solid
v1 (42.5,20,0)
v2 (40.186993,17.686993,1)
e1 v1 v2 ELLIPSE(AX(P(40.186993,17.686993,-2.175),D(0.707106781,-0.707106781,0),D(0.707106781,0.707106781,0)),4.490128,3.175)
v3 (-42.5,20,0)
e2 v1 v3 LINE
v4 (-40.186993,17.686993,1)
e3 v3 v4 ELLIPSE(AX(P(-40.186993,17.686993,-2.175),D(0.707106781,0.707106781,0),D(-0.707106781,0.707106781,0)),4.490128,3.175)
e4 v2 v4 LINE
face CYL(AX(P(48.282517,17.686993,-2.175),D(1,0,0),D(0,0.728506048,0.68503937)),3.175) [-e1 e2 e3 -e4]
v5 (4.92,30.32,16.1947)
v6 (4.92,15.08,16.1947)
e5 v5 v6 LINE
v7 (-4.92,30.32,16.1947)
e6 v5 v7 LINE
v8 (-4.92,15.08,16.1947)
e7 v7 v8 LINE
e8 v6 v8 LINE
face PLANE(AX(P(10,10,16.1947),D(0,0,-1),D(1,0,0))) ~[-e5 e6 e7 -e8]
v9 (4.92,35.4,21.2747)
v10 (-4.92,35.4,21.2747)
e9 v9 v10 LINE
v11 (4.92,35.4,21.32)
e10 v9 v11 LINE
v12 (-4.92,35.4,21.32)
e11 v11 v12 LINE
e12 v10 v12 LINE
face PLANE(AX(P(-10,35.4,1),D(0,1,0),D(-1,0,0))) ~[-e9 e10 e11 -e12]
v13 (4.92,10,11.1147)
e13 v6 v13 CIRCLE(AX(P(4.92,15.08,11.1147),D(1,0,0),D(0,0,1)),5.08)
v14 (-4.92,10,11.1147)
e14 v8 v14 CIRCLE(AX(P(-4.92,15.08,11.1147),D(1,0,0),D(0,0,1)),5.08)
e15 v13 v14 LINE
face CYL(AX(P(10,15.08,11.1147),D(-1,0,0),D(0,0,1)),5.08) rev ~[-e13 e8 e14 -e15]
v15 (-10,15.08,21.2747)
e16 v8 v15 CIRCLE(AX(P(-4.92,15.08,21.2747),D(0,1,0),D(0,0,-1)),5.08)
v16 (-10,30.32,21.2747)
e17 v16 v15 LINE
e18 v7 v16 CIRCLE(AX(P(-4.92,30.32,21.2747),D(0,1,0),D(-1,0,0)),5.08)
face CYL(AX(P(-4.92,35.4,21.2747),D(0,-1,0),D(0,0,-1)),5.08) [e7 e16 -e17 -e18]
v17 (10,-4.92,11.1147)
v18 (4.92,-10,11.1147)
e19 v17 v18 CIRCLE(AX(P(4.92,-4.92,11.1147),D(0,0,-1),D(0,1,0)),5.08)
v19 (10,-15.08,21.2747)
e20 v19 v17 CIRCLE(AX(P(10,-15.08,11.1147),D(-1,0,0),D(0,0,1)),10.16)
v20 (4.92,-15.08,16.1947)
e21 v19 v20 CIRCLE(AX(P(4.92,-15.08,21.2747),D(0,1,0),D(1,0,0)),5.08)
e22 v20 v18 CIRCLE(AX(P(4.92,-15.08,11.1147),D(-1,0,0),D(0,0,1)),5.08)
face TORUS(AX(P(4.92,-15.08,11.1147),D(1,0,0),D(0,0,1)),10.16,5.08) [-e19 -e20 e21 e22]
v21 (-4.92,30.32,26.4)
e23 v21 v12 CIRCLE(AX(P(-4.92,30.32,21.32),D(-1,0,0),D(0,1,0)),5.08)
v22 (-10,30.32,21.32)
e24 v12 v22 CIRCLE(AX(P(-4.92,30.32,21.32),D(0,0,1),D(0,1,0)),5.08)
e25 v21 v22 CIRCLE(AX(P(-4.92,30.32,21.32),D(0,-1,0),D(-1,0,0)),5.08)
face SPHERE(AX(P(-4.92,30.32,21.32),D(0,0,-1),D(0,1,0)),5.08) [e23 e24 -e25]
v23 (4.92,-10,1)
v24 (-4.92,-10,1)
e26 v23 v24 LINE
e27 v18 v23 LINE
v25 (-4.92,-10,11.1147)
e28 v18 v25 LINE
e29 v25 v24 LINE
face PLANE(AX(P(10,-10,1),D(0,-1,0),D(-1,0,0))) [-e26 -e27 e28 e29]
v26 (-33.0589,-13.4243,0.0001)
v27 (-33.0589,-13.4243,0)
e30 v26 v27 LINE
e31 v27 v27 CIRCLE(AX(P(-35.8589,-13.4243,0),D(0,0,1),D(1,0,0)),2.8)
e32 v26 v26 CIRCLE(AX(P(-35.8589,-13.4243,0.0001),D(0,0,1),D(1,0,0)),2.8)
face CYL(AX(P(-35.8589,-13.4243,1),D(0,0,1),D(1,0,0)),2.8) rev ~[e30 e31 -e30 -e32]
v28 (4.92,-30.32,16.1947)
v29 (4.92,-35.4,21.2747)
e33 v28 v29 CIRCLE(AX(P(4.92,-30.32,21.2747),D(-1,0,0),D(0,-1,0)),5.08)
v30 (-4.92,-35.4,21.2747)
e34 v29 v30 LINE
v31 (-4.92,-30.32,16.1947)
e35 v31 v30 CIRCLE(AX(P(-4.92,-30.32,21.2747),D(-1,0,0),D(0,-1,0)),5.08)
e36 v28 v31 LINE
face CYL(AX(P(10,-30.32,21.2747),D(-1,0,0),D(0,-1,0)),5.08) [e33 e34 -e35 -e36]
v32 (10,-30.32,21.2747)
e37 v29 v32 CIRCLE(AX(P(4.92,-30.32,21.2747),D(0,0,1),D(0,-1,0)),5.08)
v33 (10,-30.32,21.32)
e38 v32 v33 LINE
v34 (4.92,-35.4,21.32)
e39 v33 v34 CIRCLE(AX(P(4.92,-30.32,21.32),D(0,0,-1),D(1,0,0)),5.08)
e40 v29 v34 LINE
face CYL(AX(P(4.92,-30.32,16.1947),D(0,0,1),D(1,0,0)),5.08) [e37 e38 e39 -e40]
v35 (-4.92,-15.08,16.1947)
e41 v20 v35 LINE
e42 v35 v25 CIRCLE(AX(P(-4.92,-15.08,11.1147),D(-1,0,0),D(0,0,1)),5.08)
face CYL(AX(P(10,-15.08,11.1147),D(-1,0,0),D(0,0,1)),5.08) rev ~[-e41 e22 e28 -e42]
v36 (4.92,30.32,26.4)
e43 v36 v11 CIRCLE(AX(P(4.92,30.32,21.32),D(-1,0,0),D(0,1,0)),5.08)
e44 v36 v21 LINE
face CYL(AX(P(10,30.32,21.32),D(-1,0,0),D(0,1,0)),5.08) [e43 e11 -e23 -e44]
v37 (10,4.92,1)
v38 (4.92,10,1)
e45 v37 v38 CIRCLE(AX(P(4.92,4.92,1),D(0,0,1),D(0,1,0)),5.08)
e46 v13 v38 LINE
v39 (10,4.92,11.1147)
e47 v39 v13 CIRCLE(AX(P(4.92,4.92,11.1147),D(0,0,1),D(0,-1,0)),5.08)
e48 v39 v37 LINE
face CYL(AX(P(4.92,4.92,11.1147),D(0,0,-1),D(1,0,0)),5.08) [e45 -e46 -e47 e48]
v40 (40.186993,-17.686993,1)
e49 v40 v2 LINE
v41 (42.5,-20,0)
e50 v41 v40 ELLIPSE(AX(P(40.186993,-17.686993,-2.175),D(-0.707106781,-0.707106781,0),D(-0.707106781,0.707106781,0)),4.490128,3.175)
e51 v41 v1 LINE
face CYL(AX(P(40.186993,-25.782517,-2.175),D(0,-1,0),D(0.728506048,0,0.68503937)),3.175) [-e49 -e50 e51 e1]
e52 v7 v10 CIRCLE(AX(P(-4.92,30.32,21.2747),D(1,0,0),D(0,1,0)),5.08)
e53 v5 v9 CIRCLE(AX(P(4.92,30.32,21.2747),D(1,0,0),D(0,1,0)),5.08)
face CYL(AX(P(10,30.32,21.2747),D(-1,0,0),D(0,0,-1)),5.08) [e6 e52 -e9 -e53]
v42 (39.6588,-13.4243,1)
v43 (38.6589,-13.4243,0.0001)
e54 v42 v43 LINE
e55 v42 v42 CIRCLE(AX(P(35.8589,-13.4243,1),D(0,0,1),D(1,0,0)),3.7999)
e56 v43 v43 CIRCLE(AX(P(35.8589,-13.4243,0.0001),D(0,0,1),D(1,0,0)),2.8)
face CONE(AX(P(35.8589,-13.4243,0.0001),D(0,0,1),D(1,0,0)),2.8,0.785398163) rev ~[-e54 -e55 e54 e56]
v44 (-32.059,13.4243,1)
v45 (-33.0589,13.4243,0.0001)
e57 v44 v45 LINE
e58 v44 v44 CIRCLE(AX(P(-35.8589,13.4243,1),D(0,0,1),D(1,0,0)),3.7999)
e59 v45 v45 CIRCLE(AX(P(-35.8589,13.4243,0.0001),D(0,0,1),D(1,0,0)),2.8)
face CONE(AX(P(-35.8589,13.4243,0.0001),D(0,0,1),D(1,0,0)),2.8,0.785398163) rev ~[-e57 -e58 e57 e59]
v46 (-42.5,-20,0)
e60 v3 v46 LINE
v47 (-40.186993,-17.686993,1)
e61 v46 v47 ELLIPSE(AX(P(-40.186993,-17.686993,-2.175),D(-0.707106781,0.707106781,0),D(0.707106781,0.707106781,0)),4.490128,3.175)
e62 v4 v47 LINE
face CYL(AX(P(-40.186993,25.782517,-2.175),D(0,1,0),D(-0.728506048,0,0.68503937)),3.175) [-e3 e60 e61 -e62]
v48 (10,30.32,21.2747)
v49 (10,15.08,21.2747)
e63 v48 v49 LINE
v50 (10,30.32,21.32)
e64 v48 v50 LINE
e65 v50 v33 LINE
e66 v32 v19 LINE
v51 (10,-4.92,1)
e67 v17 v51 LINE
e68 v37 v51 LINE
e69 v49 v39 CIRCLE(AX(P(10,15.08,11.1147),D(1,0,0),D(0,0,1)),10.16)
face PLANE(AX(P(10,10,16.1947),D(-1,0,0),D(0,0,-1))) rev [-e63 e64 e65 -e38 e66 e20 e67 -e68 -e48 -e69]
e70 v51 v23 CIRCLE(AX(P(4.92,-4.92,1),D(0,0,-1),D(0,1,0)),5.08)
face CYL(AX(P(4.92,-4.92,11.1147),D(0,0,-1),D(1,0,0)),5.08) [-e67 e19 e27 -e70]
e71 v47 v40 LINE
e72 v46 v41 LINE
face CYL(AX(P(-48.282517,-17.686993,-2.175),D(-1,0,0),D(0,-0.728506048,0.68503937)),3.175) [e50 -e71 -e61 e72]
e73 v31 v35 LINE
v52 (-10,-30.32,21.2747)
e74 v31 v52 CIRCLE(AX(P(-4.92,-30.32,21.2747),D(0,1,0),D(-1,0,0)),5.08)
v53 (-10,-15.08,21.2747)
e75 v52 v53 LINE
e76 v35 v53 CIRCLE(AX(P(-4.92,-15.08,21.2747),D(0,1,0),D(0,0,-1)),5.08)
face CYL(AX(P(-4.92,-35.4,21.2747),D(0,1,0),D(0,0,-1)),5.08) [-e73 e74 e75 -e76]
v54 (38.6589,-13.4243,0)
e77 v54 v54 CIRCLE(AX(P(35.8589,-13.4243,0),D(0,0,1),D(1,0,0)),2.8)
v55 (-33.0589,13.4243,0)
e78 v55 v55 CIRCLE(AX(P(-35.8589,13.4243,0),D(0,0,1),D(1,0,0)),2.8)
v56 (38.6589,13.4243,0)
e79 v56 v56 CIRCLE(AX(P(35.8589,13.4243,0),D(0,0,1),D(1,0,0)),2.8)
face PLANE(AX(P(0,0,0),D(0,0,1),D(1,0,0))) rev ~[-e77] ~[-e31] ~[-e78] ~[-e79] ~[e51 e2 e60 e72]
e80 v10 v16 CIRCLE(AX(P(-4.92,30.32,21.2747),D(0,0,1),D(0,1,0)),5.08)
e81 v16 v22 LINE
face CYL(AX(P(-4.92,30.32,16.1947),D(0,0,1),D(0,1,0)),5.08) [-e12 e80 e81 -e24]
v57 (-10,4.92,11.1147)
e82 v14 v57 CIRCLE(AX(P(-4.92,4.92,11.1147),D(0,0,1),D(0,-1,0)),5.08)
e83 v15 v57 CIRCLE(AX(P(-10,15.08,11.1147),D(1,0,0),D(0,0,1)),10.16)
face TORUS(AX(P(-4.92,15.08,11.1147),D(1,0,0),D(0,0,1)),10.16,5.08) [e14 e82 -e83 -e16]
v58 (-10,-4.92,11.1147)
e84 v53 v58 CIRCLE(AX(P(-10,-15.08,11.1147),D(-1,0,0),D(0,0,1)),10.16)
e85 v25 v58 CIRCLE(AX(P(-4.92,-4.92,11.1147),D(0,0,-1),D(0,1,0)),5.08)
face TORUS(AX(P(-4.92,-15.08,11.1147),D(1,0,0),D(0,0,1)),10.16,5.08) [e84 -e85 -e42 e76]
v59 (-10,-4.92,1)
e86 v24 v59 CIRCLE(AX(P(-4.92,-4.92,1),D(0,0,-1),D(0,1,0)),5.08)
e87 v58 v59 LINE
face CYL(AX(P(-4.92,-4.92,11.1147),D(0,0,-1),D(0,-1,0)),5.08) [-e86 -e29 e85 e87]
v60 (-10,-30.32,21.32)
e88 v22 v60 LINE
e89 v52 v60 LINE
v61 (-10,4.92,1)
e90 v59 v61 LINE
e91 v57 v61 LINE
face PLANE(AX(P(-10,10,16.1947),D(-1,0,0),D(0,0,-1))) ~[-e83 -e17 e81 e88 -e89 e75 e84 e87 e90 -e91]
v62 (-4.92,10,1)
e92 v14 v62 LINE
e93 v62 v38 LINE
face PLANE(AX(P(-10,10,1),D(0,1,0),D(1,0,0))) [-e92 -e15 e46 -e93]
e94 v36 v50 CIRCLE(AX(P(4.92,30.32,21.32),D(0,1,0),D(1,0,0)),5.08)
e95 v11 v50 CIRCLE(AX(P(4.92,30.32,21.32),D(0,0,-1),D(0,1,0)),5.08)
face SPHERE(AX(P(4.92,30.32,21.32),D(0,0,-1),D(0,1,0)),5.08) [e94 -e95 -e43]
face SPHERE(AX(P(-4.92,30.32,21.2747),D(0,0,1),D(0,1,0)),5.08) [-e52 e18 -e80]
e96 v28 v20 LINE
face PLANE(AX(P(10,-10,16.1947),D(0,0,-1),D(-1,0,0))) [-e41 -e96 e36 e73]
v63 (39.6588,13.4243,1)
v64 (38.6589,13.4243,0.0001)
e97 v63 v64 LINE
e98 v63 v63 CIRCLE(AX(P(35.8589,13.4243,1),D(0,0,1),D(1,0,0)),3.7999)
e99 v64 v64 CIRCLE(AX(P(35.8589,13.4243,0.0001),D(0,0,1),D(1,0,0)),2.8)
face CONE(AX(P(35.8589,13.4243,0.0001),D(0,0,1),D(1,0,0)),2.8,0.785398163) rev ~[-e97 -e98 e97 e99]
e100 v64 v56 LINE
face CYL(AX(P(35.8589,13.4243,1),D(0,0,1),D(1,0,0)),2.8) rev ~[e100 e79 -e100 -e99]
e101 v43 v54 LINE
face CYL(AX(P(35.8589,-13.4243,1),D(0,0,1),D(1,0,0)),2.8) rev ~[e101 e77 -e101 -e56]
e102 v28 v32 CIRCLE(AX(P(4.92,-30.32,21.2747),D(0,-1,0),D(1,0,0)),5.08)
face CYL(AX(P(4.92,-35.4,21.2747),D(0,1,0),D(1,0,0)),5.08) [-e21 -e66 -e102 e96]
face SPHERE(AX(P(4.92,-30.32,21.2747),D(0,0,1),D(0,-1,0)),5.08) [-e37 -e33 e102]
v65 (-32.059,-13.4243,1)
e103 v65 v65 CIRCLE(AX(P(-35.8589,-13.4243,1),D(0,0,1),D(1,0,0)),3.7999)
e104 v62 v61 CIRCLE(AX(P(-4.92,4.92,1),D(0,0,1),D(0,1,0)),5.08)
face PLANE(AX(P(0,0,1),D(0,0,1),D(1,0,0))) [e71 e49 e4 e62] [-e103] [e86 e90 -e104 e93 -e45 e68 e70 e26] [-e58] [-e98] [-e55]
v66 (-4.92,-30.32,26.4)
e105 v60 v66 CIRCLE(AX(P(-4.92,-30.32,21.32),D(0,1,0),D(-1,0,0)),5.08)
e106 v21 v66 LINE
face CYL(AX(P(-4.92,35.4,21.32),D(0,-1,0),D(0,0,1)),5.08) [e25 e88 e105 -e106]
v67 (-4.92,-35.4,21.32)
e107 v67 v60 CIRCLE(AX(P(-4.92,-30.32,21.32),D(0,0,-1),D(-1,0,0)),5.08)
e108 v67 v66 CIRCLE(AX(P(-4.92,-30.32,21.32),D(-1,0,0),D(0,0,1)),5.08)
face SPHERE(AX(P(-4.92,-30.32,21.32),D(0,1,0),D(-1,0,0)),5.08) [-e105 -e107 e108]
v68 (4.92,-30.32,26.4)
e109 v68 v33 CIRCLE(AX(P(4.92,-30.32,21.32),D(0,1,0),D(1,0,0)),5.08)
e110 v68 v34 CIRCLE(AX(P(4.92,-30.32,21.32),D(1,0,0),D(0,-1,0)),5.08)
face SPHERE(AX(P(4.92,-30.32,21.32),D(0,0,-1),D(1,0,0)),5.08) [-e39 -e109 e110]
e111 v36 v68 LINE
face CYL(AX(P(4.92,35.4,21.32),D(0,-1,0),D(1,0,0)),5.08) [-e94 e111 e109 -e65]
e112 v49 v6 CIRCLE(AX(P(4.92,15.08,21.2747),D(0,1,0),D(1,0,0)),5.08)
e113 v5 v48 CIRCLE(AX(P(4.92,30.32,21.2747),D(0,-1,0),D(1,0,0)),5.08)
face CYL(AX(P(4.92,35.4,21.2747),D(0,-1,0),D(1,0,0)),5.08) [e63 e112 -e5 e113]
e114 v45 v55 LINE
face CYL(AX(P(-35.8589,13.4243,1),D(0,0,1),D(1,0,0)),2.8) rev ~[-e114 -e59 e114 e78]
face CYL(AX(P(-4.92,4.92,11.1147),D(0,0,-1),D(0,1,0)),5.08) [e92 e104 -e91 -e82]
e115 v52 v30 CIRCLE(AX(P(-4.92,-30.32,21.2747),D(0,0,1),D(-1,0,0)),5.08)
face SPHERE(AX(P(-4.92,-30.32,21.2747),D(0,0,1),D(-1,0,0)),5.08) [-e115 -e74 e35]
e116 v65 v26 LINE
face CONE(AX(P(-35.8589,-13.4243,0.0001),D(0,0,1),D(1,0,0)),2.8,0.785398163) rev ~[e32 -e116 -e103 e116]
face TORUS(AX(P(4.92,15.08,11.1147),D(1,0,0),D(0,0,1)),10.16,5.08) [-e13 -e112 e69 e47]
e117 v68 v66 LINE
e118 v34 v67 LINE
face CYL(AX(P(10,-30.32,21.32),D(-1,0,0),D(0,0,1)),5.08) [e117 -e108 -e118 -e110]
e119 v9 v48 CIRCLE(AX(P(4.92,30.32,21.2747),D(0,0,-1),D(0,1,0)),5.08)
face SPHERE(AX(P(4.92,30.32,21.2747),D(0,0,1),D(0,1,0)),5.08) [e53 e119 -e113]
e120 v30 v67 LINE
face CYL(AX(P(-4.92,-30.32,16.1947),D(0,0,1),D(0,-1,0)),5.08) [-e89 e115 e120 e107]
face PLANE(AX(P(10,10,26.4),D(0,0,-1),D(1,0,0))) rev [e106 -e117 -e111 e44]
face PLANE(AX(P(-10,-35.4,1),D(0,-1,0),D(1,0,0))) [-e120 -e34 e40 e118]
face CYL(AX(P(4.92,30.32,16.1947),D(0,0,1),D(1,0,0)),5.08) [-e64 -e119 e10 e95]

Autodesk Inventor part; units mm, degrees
ref_plane "YZ Plane" through (0, 0, 0) normal (1, 0, 0) x (0, 1, 0)
ref_plane "XZ Plane" through (0, 0, 0) normal (0, 1, 0) x (-1, 0, 0)
ref_plane "XY Plane" through (0, 0, 0) normal (0, 0, 1) x (1, 0, 0)
sketch "Sketch1" plane through (0, 0, 0) normal (0, 0, 1) x (1, 0, 0)
  line L0 (-42.5, -20) -> (42.5, -20)
  line L1 (42.5, -20) -> (42.5, 20)
  line L2 (42.5, 20) -> (-42.5, 20)
  line L3 (-42.5, 20) -> (-42.5, -20)
  line L4 (-42.5, -20) -> (42.5, 20) construction
  line L5 (42.5, -20) -> (-42.5, 20) construction
  point P0 (0, 0)
  dimension "d0" = 85
  dimension "d1" = 40
extrude "Extrusion1" add sketch "Sketch1" along normal blind 1
fillet "Fillet1" radius 3.175 4 edges at (-42.5, 0, 1) (0, 20, 1) (0, -20, 1) (42.5, 0, 1)
sketch "Sketch2" plane through (0, 0, 1) normal (0, 0, 1) x (1, 0, 0)
  line L0 (-40.187, -17.687) -> (-40.187, 17.687) construction
  line L1 (-40.187, 0) -> (40.187, 0) construction
  line L2 (40.187, 17.687) -> (40.187, -17.687) construction
  line L3 (-40.187, 17.687) -> (40.187, 17.687) construction
  line L4 (0, 17.687) -> (0, -17.687) construction
  line L5 (40.187, -17.687) -> (-40.187, -17.687) construction
  line L6 (10, -10) -> (-10, -10)
  line L7 (-10, -10) -> (-10, 10)
  line L8 (-10, 10) -> (10, 10)
  line L9 (10, 10) -> (10, -10)
  line L10 (10, -10) -> (-10, 10) construction
  line L11 (-10, -10) -> (10, 10) construction
  point P0 (0, 0)
  dimension "d5" = 20
  dimension "d6" = 20
extrude "Extrusion2" add sketch "Sketch2" along normal blind 25.4
sketch "Sketch3" plane through (-10, -10, 1) normal (0, -1, 0) x (1, 0, 0)
  line L0 (20, 25.4) -> (0, 25.4) projected
  line L1 (20, 0) -> (20, 25.4) projected
  line L2 (0, 25.4) -> (20, 25.4)
  line L3 (20, 25.4) -> (20, 15.1947)
  line L4 (20, 15.1947) -> (0, 15.1947)
  line L5 (0, 15.1947) -> (0, 25.4)
  point P0 (10, -1)
sketch "Sketch4" plane through (0, 0, 26.4) normal (0, 0, 1) x (1, 0, 0)
  line L0 (-10, -10) -> (-10, 10) construction
  line L1 (-10, 0) -> (10, 0) construction
  line L2 (10, 10) -> (10, -10) construction
  point P0 (0, 0)
ref_plane "Work Plane1" through (-10, 0, 26.4) normal (0, -1, 0) x (1, 0, 0)
extrude "Extrusion3" add sketch "Sketch3" along normal blind 25.4
mirror "Mirror1" about plane through (-10, 0, 26.4) normal (0, -1, 0) of "Extrusion3"
fillet "Fillet2" radius 5.08 2 edges at (0, -10, 16.1947) (0, 10, 16.1947)
fillet "Fillet3" radius 5.08 22 edges at (-10, 35.4, 21.2974) (10, 35.4, 21.2974) (0, 35.4, 16.1947) (0, 35.4, 26.4) (-10, 0, 26.4) (-10, -35.4, 21.2974) (10, -35.4, 21.2974) (10, 0, 26.4) (10, 11.4879, 14.7068) (10, 10, 6.0574) (10, 25.24, 16.1947) (-10, 11.4879, 14.7068) (-10, 10, 6.0574) (-10, 25.24, 16.1947) (-10, -11.4879, 14.7068) (-10, -10, 6.0574) (-10, -25.24, 16.1947) (0, -35.4, 16.1947) (10, -11.4879, 14.7068) (10, -10, 6.0574) (10, -25.24, 16.1947) (0, -35.4, 26.4)
sketch "Sketch5" plane through (0, 0, 1) normal (0, 0, 1) x (1, 0, 0)
  circle A0 centre (-35.8589, 13.4243) radius 2.8
  line L0 (59.5, 0) -> (-59.5, 0) projected
  line L1 (10, 4.92) -> (10, -4.92) projected
  arc A1 (4.92, -10) -> (10, -4.92) centre (4.92, -4.92) ccw projected
  line L2 (4.92, -10) -> (-4.92, -10) projected
  arc A2 (-10, -4.92) -> (-4.92, -10) centre (-4.92, -4.92) ccw projected
  line L3 (-10, -4.92) -> (-10, 4.92) projected
  arc A3 (-4.92, 10) -> (-10, 4.92) centre (-4.92, 4.92) ccw projected
  line L4 (-4.92, 10) -> (4.92, 10) projected
  arc A4 (10, 4.92) -> (4.92, 10) centre (4.92, 4.92) ccw projected
  line L5 (40.187, 17.687) -> (40.187, -17.687) projected
  line L6 (-40.187, 17.687) -> (40.187, 17.687) projected
  line L7 (-40.187, -17.687) -> (-40.187, 17.687) projected
  line L8 (40.187, -17.687) -> (-40.187, -17.687) projected
  circle A5 centre (-35.8589, -13.4243) radius 2.8
  line L9 (42.5, 20) -> (-42.5, 20) construction
  line L10 (0, 20) -> (0, -20) construction
  line L11 (-42.5, -20) -> (42.5, -20) construction
  circle A6 centre (35.8589, 13.4243) radius 2.8
  circle A7 centre (35.8589, -13.4243) radius 2.8
  point P0 (0, 0)
  dimension "d14" = 5.6
extrude "Extrusion4" cut sketch "Sketch5" against normal blind 345.1324 contours A0 | A5 | A6 | A7
chamfer "Chamfer1" distance 1 angle 45 4 edges at (33.0589, 13.4243, 1) (33.0589, -13.4243, 1) (-38.6589, 13.4243, 1) (-38.6589, -13.4243, 1)
properties part number "WireWrappoMatica(TM)"
